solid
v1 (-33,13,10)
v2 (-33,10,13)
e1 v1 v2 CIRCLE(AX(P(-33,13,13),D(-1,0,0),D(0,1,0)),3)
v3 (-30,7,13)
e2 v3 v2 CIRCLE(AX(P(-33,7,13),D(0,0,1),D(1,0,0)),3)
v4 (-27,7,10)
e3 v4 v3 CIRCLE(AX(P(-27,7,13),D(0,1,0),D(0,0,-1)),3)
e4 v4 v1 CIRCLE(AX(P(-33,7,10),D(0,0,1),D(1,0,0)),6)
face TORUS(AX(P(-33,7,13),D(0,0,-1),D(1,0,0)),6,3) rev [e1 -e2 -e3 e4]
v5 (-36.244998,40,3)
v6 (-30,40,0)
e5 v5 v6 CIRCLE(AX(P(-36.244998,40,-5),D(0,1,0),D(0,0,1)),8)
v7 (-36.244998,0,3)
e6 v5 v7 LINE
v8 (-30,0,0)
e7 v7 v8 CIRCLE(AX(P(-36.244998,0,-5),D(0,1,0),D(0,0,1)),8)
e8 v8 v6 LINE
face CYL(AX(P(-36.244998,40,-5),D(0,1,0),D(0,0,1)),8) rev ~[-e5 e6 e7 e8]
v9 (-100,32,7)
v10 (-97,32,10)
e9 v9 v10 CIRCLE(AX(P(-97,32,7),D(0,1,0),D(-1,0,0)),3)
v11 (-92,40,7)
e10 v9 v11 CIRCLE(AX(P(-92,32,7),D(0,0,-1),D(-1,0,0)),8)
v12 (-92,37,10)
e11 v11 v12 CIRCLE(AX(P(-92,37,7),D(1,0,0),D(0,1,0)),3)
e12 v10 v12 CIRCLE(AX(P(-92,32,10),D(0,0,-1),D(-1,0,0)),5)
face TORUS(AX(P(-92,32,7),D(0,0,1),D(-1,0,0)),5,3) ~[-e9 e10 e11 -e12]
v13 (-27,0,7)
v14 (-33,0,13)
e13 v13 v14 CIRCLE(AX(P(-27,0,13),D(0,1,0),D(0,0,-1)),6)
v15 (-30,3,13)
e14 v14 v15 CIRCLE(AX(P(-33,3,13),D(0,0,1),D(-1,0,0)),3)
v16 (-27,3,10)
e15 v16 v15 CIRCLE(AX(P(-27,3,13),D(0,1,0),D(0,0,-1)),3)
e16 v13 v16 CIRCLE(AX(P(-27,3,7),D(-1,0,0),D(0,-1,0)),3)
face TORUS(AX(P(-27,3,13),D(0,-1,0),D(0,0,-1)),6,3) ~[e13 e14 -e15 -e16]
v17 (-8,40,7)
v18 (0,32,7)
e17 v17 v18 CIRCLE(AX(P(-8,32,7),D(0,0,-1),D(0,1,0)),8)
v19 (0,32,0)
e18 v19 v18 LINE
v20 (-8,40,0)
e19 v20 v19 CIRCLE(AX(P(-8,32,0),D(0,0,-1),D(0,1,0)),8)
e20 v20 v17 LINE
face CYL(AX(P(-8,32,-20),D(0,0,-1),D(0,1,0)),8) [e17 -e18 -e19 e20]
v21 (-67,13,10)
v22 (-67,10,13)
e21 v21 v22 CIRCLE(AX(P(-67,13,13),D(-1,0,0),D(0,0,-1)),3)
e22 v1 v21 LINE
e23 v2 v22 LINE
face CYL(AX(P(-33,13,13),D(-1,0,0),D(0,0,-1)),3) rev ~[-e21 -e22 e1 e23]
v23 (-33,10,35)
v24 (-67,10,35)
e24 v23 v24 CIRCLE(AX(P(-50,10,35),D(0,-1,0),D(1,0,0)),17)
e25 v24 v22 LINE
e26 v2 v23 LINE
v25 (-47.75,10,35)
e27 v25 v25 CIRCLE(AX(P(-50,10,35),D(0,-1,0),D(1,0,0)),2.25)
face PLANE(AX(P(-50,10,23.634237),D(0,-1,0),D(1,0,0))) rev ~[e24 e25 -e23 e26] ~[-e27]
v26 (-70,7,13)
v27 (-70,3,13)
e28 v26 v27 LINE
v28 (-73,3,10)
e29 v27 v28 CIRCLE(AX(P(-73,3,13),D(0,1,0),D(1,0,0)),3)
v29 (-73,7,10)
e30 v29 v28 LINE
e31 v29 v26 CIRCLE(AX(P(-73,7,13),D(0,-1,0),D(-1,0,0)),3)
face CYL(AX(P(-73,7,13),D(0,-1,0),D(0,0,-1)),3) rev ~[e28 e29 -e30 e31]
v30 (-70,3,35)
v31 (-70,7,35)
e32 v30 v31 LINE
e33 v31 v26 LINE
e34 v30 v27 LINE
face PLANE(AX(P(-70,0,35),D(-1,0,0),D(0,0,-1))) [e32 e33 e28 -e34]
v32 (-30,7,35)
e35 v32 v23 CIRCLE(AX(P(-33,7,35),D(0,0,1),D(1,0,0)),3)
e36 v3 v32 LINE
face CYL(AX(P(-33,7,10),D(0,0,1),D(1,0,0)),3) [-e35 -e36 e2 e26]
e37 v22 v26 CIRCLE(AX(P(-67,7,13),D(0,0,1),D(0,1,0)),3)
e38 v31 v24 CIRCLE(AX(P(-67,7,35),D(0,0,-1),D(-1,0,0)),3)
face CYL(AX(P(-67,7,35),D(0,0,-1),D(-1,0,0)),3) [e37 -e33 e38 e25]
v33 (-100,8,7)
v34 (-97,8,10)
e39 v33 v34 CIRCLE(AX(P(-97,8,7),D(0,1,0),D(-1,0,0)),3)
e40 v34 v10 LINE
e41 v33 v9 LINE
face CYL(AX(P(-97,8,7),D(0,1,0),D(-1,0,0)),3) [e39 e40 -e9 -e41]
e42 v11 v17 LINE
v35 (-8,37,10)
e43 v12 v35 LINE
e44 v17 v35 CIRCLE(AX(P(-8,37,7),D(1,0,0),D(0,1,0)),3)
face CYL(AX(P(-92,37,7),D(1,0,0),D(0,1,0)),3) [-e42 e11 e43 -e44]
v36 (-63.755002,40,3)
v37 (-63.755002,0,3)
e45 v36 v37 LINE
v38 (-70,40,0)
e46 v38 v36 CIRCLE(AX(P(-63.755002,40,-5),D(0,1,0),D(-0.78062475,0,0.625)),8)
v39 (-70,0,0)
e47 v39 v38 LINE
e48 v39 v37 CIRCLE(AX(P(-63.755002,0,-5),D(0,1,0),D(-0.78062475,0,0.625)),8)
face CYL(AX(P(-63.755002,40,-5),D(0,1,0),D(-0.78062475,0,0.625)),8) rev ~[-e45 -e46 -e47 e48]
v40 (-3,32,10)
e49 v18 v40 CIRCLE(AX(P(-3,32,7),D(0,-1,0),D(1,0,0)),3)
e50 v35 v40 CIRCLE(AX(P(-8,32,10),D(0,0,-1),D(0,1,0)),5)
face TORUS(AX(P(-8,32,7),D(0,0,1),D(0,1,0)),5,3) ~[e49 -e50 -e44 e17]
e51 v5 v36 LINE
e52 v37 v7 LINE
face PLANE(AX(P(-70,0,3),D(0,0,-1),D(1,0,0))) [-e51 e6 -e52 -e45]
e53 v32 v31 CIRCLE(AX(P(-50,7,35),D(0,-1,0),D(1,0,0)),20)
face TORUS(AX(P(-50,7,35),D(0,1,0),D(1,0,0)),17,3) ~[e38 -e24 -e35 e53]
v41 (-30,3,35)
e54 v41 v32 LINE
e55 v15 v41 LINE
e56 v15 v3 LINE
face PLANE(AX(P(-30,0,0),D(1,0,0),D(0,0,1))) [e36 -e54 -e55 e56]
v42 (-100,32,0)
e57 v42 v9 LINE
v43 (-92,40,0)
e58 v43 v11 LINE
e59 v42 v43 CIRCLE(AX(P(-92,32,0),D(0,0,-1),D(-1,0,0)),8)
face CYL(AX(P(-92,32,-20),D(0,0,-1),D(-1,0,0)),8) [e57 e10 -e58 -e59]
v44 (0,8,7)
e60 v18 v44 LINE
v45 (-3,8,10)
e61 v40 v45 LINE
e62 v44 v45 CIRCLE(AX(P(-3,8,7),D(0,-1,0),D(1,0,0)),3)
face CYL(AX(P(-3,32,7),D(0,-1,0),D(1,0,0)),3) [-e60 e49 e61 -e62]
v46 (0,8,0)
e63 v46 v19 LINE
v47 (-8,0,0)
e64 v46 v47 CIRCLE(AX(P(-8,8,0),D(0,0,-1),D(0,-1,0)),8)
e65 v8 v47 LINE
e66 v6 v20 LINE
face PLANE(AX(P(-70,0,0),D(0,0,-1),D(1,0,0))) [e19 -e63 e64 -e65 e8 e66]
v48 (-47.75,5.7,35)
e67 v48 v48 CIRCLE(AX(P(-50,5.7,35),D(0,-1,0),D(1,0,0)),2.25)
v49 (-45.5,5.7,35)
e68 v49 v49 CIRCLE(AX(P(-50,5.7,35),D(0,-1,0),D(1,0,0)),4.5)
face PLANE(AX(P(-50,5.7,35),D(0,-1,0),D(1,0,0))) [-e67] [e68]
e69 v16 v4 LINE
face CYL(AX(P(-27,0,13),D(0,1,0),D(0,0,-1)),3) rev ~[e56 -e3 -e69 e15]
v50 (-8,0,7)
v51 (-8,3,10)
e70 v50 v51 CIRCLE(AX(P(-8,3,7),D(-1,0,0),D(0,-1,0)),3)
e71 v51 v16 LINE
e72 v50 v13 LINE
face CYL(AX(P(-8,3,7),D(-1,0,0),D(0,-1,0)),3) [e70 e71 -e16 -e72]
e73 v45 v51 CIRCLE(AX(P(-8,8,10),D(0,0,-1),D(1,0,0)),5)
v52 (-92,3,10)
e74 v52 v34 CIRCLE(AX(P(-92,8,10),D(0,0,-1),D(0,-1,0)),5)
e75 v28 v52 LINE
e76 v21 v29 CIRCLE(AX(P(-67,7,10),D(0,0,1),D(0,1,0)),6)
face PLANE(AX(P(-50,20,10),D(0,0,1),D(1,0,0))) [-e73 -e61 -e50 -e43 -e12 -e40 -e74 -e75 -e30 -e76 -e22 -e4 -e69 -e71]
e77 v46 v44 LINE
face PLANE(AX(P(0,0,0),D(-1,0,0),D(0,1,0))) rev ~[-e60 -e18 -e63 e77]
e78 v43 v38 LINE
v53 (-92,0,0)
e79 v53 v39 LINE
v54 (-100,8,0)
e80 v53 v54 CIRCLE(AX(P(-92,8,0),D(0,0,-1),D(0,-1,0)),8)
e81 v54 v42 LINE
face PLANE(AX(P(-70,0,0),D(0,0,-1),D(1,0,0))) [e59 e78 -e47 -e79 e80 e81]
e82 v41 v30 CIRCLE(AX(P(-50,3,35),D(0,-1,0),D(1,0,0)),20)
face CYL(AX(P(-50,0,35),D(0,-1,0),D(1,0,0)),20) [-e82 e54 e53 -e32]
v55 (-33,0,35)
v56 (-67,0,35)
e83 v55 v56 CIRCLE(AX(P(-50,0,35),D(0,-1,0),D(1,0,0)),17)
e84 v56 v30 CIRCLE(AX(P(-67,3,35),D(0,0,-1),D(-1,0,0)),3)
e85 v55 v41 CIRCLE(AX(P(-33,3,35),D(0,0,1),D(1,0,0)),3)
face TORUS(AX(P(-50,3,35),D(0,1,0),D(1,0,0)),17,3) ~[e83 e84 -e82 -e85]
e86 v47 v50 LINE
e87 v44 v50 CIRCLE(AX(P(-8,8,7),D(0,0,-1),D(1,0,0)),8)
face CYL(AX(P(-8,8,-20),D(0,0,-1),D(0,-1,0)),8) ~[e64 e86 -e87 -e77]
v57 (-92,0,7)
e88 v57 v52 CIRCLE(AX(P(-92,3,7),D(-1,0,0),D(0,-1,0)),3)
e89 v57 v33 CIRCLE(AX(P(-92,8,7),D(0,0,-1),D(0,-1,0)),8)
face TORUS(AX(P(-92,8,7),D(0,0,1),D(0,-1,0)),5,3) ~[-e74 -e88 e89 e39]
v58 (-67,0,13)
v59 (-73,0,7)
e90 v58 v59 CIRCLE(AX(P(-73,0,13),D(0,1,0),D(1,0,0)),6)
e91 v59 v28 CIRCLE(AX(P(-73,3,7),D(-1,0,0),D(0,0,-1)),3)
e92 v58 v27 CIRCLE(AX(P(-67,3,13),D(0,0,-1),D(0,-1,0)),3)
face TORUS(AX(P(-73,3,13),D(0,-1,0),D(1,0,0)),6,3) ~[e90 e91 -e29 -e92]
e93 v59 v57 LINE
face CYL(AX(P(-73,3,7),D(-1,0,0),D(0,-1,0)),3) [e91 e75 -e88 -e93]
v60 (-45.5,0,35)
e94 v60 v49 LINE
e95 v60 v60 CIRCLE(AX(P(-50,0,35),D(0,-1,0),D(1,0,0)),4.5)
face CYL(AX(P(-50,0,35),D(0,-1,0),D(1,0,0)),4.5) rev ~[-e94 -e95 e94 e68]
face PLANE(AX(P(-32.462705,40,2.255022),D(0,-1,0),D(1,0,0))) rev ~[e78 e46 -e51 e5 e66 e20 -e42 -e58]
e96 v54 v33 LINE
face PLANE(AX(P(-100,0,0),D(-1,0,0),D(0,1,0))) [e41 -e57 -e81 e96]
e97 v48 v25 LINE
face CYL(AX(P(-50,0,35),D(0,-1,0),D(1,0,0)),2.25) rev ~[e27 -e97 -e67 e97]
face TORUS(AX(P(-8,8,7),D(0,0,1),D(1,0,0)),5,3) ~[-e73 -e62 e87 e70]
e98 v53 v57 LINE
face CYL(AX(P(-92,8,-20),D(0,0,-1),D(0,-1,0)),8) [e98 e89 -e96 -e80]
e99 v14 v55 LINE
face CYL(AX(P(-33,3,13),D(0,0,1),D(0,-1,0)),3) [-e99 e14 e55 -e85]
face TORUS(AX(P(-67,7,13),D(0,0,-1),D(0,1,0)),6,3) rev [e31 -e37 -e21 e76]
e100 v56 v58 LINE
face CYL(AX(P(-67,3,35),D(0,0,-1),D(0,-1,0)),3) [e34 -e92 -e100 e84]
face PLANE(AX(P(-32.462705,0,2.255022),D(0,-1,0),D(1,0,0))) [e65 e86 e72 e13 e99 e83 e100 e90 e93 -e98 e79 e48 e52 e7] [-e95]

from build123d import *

# Parameters (mm, degrees)
F0_W          = 100
F0_H          = 40
F1_DEPTH      = 10
F3_DEPTH      = 10
F4_W          = 40
F4_H          = 3
F5_DEPTH      = 40.001
F6_R          = 2.25
F7_DEPTH      = 5.7
F8_R          = 2.25
F9_DEPTH      = 40.001
F10_R         = 4.5
F11_DEPTH     = 5.7
F12_T1_DEPTH  = 40
F12_T3_DEPTH  = 40
F12_T5_DEPTH  = 50
F12_T7_DEPTH  = 50
F12_T9_DEPTH  = 50
F12_T11_DEPTH = 50
F13_F1_R      = 3
F13_F2_R      = 3
F13_F3_R      = 3


# Not quite as in the source:
# - a fillet or chamfer that OpenCascade refuses, or shapes differently, is made with other operations: its cross-section is extruded or revolved along the edge and cut away or added


with BuildPart() as f1:
    # F0 (on Top) → F1 (new body)
    with BuildSketch(Plane.XY):
        with Locations((-50, 20)):
            Rectangle(F0_W, F0_H)
    extrude(amount=F1_DEPTH)

    # F2 (on Front) → F3 (join)
    with BuildSketch(Plane.XZ):
        with BuildLine():
            Line((-70, 35), (-70, 0))
            Line((-70, 0), (-30, 0))
            Line((-30, 0), (-30, 35))
            ThreePointArc((-30, 35), (-50, 55), (-70, 35))
        make_face()
    extrude(amount=-F3_DEPTH)

    # F4 (on face) → F5 (cut, through all)
    with BuildSketch(Plane.XZ):
        with Locations((-50, 1.5)):
            Rectangle(F4_W, F4_H)
    extrude(amount=-F5_DEPTH, mode=Mode.SUBTRACT)

    # F6 (on face) → F7 (cut)
    with BuildSketch(Plane.XZ):
        with Locations((-50, 35)):
            Circle(F6_R)
    extrude(amount=F7_DEPTH, mode=Mode.SUBTRACT)

    # F8 (on face) → F9 (cut, through all)
    with BuildSketch(Plane.XZ):
        with Locations((-50, 35)):
            Circle(F8_R)
    extrude(amount=-F9_DEPTH, mode=Mode.SUBTRACT)

    # F10 (on face) → F11 (cut)
    with BuildSketch(Plane.XZ):
        with Locations((-50, 35)):
            Circle(F10_R)
    extrude(amount=-F11_DEPTH, mode=Mode.SUBTRACT)

    # F12: fillet of radius 8 on 6 edges, made by hand

    # F12_s2 → F12_t1 (join)
    with BuildSketch(Plane.XZ.offset(-40)):
        with BuildLine():
            ThreePointArc((-70, 0), (-67.2191036167, 2.2111025509), (-63.7550020016, 3))
            Line((-63.7550020016, 3), (-70, 3))
            Line((-70, 3), (-70, 0))
        make_face()
    extrude(amount=F12_T1_DEPTH)

    # F12_s4 → F12_t3 (join)
    with BuildSketch(Plane.XZ.offset(-40)):
        with BuildLine():
            ThreePointArc((-36.2449979984, 3), (-32.7808963833, 2.2111025509), (-30, 0))
            Line((-30, 0), (-30, 3))
            Line((-30, 3), (-36.2449979984, 3))
        make_face()
    extrude(amount=F12_T3_DEPTH)

    # F12_s6 → F12_t5 (cut)
    with BuildSketch(Plane.XY.offset(-20)):
        with BuildLine():
            ThreePointArc((-92, 0), (-97.6568542495, 2.3431457505), (-100, 8))
            Line((-100, 8), (-100, 0))
            Line((-100, 0), (-92, 0))
        make_face()
    extrude(amount=F12_T5_DEPTH, mode=Mode.SUBTRACT)

    # F12_s8 → F12_t7 (cut)
    with BuildSketch(Plane.XY.offset(-20)):
        with BuildLine():
            ThreePointArc((-8, 0), (-2.3431457505, 2.3431457505), (0, 8))
            Line((0, 8), (0, 0))
            Line((0, 0), (-8, 0))
        make_face()
    extrude(amount=F12_T7_DEPTH, mode=Mode.SUBTRACT)

    # F12_s10 → F12_t9 (cut)
    with BuildSketch(Plane.XY.offset(-20)):
        with BuildLine():
            ThreePointArc((-100, 32), (-97.6568542495, 37.6568542495), (-92, 40))
            Line((-92, 40), (-100, 40))
            Line((-100, 40), (-100, 32))
        make_face()
    extrude(amount=F12_T9_DEPTH, mode=Mode.SUBTRACT)

    # F12_s12 → F12_t11 (cut)
    with BuildSketch(Plane.XY.offset(-20)):
        with BuildLine():
            ThreePointArc((-8, 40), (-2.3431457505, 37.6568542495), (0, 32))
            Line((0, 32), (0, 40))
            Line((0, 40), (-8, 40))
        make_face()
    extrude(amount=F12_T11_DEPTH, mode=Mode.SUBTRACT)

    # F13: fillet of radius 3 on 19 edges, made by hand

    # F13_f1
    f13_f1_edges = [f1.edges().sort_by_distance(p)[0] for p in [
        (-50, 10, 55),
        (-30, 10, 22.5),
        (-70, 10, 22.5),
    ]]
    fillet(f13_f1_edges, radius=F13_F1_R)

    # F13_f2
    f13_f2_edges = [f1.edges().sort_by_distance(p)[0] for p in [
        (-30, 3.5, 10),
        (-50, 10, 10),
        (-69.1213203436, 9.1213203436, 10),
        (-30.8786796564, 9.1213203436, 10),
    ]]
    fillet(f13_f2_edges, radius=F13_F2_R)

    # F13_f3
    f13_f3_edges = [f1.edges().sort_by_distance(p)[0] for p in [
        (-50, 0, 55),
        (-17.5, 0, 10),
        (-30, 0, 24),
        (-70, 0, 24),
        (-82.5, 0, 10),
        (-2.3431457505, 2.3431457505, 10),
        (-97.6568542495, 2.3431457505, 10),
        (-100, 20, 10),
        (-97.6568542495, 37.6568542495, 10),
        (-50, 40, 10),
        (-2.3431457505, 37.6568542495, 10),
        (0, 20, 10),
        (-70.8786796564, 0, 10.8786796564),
        (-29.1213203436, 0, 10.8786796564),
    ]]
    fillet(f13_f3_edges, radius=F13_F3_R)


solid = f1.part
